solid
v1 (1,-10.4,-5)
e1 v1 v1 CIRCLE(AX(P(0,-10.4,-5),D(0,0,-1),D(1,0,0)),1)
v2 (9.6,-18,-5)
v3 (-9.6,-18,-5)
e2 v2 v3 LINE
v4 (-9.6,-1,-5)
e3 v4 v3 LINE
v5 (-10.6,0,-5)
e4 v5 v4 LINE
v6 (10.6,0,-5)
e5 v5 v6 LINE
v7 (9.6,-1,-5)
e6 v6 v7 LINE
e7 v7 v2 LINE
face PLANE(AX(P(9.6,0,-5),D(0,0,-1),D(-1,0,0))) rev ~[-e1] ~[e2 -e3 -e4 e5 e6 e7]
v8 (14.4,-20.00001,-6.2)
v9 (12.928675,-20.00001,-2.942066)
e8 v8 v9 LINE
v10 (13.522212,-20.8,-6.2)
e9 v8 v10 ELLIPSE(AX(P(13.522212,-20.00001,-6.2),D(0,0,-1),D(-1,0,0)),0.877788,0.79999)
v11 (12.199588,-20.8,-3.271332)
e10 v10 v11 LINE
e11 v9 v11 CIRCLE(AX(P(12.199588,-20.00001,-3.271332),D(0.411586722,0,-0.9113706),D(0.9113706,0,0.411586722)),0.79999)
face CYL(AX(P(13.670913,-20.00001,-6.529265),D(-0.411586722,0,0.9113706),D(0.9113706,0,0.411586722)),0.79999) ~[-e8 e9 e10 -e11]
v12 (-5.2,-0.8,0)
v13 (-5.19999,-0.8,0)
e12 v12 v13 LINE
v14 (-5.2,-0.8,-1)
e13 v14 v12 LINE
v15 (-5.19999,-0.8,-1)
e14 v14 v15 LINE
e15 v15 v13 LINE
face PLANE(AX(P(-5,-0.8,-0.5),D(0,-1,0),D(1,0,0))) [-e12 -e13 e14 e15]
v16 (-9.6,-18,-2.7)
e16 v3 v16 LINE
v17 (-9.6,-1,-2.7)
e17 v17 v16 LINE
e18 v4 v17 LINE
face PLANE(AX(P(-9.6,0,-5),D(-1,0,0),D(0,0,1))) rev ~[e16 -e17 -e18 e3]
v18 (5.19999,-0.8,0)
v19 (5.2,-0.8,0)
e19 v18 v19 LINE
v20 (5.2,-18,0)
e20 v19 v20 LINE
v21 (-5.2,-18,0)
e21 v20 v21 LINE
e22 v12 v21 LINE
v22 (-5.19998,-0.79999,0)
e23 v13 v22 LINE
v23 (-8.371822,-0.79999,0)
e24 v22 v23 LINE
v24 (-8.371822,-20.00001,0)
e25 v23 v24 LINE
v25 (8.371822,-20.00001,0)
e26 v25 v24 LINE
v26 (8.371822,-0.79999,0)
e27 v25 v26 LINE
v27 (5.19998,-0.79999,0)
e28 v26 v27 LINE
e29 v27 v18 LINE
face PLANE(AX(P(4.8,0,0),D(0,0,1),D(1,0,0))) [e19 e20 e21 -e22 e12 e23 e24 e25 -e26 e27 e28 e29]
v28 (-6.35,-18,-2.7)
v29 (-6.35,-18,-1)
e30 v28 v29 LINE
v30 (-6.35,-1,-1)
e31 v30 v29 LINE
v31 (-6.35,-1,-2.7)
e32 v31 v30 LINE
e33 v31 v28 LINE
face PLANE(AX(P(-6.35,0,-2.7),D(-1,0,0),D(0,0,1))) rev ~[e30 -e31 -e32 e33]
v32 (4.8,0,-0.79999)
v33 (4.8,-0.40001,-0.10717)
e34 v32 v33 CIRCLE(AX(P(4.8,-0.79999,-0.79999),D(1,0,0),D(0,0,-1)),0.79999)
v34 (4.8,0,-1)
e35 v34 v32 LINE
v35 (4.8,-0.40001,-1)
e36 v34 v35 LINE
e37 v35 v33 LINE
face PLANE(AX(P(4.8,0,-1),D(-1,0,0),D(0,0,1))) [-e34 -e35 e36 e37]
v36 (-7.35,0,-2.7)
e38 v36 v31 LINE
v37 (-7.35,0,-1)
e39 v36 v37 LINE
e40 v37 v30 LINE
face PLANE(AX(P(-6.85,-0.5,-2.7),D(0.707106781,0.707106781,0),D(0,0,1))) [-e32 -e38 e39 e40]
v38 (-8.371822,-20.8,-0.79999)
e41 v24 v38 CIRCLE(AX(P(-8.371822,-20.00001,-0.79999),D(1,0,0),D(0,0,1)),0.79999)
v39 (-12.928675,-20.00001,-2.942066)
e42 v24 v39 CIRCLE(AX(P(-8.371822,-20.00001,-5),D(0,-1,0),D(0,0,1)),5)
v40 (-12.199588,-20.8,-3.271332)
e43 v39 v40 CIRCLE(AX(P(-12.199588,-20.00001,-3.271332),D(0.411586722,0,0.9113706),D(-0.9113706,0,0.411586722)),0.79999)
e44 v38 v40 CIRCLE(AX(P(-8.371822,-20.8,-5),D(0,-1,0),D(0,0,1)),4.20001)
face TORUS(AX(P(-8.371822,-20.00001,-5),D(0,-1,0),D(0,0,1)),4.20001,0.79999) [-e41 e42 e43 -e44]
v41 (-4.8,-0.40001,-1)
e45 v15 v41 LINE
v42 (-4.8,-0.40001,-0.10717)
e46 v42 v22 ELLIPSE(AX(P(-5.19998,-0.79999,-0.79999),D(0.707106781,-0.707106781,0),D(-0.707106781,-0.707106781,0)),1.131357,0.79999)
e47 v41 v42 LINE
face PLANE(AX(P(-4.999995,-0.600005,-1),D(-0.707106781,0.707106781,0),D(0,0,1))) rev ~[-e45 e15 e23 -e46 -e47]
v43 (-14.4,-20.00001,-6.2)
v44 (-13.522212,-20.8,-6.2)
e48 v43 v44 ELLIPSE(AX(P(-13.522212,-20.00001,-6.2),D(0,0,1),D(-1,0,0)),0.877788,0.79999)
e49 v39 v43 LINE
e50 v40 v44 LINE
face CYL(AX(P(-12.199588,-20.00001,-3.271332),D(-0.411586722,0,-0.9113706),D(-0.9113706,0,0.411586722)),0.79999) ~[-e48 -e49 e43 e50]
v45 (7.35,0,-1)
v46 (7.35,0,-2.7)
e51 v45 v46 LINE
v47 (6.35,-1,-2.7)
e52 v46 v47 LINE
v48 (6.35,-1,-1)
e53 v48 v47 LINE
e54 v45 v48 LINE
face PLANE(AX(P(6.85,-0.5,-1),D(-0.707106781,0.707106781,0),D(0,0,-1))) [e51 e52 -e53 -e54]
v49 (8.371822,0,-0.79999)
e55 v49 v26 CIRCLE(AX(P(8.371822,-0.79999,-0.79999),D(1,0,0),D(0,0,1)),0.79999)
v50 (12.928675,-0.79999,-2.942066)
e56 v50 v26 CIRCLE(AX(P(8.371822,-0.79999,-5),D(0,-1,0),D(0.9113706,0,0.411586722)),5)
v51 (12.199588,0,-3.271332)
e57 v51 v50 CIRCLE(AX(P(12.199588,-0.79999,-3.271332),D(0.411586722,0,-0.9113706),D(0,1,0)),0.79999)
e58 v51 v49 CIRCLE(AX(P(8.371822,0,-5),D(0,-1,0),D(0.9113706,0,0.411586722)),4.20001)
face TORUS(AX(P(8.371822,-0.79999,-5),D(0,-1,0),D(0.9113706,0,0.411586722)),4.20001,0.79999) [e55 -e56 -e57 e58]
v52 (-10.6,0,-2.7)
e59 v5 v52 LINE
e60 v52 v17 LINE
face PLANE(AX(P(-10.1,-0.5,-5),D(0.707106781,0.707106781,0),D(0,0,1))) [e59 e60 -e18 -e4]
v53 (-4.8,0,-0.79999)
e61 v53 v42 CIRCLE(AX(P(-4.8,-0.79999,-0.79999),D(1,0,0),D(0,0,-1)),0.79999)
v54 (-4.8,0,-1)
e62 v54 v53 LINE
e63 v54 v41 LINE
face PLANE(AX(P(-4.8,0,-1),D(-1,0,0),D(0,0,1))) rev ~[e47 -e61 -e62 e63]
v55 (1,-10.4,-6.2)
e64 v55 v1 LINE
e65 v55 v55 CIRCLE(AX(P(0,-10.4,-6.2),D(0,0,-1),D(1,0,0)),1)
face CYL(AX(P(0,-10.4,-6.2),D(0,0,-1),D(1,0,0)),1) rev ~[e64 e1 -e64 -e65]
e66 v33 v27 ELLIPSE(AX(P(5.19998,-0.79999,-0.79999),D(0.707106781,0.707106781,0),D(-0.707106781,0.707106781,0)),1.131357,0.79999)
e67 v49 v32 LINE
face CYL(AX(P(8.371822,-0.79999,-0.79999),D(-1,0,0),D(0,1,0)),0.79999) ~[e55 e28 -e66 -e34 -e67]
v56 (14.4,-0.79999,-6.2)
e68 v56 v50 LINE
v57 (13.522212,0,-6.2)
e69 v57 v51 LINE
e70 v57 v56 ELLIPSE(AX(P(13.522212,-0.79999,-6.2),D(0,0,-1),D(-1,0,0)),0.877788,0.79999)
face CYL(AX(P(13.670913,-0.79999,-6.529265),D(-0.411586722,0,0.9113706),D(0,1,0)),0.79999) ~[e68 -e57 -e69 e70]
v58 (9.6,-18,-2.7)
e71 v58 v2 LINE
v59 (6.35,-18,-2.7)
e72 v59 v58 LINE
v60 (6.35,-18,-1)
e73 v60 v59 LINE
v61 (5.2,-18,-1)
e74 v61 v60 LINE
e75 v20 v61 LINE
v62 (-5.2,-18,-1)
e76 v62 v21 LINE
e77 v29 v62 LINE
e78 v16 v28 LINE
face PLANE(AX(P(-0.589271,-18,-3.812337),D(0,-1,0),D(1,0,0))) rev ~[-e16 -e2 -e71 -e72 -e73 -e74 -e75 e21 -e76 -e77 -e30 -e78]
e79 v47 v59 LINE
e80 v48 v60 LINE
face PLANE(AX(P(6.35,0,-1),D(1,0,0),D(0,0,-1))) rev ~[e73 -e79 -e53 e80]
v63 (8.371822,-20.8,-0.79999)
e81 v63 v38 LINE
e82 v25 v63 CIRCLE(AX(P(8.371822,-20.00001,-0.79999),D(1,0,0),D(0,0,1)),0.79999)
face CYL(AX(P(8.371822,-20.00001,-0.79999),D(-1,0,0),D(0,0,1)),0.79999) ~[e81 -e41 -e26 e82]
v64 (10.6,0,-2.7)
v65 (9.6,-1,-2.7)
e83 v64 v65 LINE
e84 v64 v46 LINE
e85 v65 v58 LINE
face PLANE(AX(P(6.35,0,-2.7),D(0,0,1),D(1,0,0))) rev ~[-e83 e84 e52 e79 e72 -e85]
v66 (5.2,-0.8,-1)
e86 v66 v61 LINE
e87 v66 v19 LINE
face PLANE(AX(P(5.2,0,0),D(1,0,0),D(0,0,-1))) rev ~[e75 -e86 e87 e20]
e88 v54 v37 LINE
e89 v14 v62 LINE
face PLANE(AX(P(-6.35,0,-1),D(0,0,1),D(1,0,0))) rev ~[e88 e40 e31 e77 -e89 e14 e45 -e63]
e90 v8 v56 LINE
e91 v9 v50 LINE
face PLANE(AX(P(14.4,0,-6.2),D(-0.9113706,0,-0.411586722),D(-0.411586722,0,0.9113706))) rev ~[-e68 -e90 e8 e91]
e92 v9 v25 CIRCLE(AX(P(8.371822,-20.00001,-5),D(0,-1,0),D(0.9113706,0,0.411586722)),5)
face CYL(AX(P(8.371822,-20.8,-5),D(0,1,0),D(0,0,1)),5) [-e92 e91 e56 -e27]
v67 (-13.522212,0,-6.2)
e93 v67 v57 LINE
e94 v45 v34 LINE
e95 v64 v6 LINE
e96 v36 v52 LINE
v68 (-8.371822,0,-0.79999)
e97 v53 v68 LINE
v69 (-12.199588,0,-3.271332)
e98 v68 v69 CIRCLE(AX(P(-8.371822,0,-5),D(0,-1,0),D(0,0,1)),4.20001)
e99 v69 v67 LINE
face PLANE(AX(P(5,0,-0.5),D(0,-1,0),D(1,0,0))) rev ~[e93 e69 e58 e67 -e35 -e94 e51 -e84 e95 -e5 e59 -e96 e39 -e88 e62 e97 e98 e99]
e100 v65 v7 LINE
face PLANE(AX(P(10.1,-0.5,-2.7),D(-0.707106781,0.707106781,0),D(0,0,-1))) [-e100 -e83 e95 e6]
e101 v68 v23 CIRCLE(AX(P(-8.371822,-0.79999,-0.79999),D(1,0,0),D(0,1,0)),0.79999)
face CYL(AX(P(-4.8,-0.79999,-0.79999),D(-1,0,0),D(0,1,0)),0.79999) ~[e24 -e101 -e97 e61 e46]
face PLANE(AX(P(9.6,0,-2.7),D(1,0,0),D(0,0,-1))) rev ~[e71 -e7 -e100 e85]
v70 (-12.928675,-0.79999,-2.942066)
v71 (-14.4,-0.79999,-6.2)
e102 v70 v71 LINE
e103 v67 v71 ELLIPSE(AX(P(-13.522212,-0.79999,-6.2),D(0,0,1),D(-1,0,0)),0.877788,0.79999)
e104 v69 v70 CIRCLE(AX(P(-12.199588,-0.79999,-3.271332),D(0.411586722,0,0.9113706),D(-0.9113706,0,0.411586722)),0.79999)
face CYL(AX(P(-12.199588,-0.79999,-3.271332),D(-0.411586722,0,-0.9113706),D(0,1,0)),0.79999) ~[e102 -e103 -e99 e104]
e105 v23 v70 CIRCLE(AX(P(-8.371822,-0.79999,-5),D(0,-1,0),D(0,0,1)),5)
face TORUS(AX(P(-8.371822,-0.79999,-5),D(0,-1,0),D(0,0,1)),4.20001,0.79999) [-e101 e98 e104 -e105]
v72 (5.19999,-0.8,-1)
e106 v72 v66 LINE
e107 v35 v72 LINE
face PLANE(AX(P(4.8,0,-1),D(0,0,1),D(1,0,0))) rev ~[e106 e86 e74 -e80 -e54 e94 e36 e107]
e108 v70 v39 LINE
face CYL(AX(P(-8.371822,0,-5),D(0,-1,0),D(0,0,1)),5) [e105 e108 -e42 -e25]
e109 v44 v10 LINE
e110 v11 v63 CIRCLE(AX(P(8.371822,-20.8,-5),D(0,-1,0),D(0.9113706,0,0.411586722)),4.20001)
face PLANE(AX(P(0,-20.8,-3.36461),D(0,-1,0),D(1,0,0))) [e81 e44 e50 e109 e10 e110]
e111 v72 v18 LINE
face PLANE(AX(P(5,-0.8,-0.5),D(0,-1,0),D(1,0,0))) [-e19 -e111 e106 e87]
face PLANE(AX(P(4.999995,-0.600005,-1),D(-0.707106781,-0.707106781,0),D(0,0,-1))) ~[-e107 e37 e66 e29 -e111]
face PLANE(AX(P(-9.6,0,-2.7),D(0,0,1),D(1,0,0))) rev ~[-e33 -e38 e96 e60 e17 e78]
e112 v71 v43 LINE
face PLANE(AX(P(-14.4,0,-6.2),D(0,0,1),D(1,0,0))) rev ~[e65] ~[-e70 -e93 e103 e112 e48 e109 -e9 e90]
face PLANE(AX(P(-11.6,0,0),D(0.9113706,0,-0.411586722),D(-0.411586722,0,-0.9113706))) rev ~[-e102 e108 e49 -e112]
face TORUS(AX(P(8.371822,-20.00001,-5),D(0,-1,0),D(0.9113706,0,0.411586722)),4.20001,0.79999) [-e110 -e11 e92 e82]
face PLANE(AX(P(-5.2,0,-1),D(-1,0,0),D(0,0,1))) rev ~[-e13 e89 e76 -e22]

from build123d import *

# Parameters (mm, degrees)
F1_DEPTH  = 20
F3_DEPTH  = 2
F0_W      = 0.4
F0_H      = 1
F4_DEPTH  = 0.8
F5_SIZE   = 0.39999
F6_R      = 5
F7_R      = 0.79999
F8_SIZE   = 1
F9_R      = 1
F10_DEPTH = 1.2


# Not quite as in the source:
# - a fillet or chamfer is up to 0.001 mm smaller than in the source, because OpenCascade refuses the exact size


with BuildPart() as f1:
    # F0 (on Front) → F1 (new body)
    with BuildSketch(Plane.XZ):
        Polygon((9.6, -5), (0, -5), (-9.6, -5), (-9.6, -2.7), (-6.35, -2.7), (-6.35, -1), (-5.2, -1), (-5.2, 0), (-11.6, 0), (-14.4, -6.2), (0, -6.2), (14.4, -6.2), (11.6, 0), (5.2, 0), (5.2, -1), (6.35, -1), (6.35, -2.7), (9.6, -2.7), align=None)
    extrude(amount=F1_DEPTH)

    # F2 (on face) → F3 (join)
    with BuildSketch(Plane.XZ.offset(20)):
        Polygon((-5.2, 0), (-11.6, 0), (-14.4, -6.2), (11.6, -6.2), (11.6, 0), (5.2, 0), (5.2, -1), (6.35, -1), (6.35, -2.7), (9.6, -2.7), (9.6, -5), (-9.6, -5), (-9.6, -2.7), (-6.35, -2.7), (-6.35, -1), (-5.2, -1), align=None)
        Polygon((5.2, 0), (-5.2, 0), (-5.2, -1), (-6.35, -1), (-6.35, -2.7), (-9.6, -2.7), (-9.6, -5), (9.6, -5), (9.6, -2.7), (6.35, -2.7), (6.35, -1), (5.2, -1), align=None)
    extrude(amount=-F3_DEPTH)

    # F0 (on Front) + F3_face (on face) + F3_face1 (on face) → F4 (join)
    with BuildSketch(Plane.XZ):
        with Locations((5, -0.5)):
            Rectangle(F0_W, F0_H)
        with Locations((-5, -0.5)):
            Rectangle(F0_W, F0_H)
    with BuildSketch(Plane(origin=(0, -18, -2.8254432042), x_dir=(1, 0, 0), z_dir=(0, 1, 0))):
        Polygon((-5.2, -2.8254432042), (5.2, -2.8254432042), (5.2, -1.8254432042), (6.35, -1.8254432042), (6.35, -0.1254432042), (9.6, -0.1254432042), (9.6, 2.1745567958), (-9.6, 2.1745567958), (-9.6, -0.1254432042), (-6.35, -0.1254432042), (-6.35, -1.8254432042), (-5.2, -1.8254432042), align=None)
    with BuildSketch(Plane(origin=(0, -20, -3.2112820513), x_dir=(1, 0, 0), z_dir=(0, -1, 0))):
        Polygon((14.4, -2.9887179487), (11.6, 3.2112820513), (-11.6, 3.2112820513), (-14.4, -2.9887179487), align=None)
    extrude(amount=F4_DEPTH, dir=(0, -1, 0))

    # F5 (size 0.4 in the source; OpenCascade refuses exactly that, so slightly less here)
    f5_edges = [f1.edges().sort_by_distance(p)[0] for p in [
        (-4.8, -0.8, -0.5),
        (4.8, -0.8, -0.5),
    ]]
    chamfer(f5_edges, length=F5_SIZE)

    # F6
    f6_edges = [f1.edges().sort_by_distance(p)[0] for p in [
        (11.6, -10.4, 0),
        (-11.6, -10.4, 0),
    ]]
    fillet(f6_edges, radius=F6_R)

    # F7 (radius 0.8 in the source; OpenCascade refuses exactly that, so slightly less here)
    f7_edges = [f1.edges().sort_by_distance(p)[0] for p in [
        (13.664338, -20.8, -4.571033),
        (13.664338, 0, -4.571033),
        (-11.083863, 0, -0.799425),
    ]]
    fillet(f7_edges, radius=F7_R)

    # F8
    f8_edges = [f1.edges().sort_by_distance(p)[0] for p in [
        (-9.6, 0, -3.85),
        (-6.35, 0, -1.85),
        (6.35, 0, -1.85),
        (9.6, 0, -3.85),
    ]]
    chamfer(f8_edges, length=F8_SIZE)

    # F9 (on face) → F10 (cut, through all)
    with BuildSketch(Plane(origin=(0, 0, -6.2), x_dir=(1, 0, 0), z_dir=(0, 0, -1))):
        with Locations((0, 10.4)):
            Circle(F9_R)
    extrude(amount=-F10_DEPTH, mode=Mode.SUBTRACT)


solid = f1.part
